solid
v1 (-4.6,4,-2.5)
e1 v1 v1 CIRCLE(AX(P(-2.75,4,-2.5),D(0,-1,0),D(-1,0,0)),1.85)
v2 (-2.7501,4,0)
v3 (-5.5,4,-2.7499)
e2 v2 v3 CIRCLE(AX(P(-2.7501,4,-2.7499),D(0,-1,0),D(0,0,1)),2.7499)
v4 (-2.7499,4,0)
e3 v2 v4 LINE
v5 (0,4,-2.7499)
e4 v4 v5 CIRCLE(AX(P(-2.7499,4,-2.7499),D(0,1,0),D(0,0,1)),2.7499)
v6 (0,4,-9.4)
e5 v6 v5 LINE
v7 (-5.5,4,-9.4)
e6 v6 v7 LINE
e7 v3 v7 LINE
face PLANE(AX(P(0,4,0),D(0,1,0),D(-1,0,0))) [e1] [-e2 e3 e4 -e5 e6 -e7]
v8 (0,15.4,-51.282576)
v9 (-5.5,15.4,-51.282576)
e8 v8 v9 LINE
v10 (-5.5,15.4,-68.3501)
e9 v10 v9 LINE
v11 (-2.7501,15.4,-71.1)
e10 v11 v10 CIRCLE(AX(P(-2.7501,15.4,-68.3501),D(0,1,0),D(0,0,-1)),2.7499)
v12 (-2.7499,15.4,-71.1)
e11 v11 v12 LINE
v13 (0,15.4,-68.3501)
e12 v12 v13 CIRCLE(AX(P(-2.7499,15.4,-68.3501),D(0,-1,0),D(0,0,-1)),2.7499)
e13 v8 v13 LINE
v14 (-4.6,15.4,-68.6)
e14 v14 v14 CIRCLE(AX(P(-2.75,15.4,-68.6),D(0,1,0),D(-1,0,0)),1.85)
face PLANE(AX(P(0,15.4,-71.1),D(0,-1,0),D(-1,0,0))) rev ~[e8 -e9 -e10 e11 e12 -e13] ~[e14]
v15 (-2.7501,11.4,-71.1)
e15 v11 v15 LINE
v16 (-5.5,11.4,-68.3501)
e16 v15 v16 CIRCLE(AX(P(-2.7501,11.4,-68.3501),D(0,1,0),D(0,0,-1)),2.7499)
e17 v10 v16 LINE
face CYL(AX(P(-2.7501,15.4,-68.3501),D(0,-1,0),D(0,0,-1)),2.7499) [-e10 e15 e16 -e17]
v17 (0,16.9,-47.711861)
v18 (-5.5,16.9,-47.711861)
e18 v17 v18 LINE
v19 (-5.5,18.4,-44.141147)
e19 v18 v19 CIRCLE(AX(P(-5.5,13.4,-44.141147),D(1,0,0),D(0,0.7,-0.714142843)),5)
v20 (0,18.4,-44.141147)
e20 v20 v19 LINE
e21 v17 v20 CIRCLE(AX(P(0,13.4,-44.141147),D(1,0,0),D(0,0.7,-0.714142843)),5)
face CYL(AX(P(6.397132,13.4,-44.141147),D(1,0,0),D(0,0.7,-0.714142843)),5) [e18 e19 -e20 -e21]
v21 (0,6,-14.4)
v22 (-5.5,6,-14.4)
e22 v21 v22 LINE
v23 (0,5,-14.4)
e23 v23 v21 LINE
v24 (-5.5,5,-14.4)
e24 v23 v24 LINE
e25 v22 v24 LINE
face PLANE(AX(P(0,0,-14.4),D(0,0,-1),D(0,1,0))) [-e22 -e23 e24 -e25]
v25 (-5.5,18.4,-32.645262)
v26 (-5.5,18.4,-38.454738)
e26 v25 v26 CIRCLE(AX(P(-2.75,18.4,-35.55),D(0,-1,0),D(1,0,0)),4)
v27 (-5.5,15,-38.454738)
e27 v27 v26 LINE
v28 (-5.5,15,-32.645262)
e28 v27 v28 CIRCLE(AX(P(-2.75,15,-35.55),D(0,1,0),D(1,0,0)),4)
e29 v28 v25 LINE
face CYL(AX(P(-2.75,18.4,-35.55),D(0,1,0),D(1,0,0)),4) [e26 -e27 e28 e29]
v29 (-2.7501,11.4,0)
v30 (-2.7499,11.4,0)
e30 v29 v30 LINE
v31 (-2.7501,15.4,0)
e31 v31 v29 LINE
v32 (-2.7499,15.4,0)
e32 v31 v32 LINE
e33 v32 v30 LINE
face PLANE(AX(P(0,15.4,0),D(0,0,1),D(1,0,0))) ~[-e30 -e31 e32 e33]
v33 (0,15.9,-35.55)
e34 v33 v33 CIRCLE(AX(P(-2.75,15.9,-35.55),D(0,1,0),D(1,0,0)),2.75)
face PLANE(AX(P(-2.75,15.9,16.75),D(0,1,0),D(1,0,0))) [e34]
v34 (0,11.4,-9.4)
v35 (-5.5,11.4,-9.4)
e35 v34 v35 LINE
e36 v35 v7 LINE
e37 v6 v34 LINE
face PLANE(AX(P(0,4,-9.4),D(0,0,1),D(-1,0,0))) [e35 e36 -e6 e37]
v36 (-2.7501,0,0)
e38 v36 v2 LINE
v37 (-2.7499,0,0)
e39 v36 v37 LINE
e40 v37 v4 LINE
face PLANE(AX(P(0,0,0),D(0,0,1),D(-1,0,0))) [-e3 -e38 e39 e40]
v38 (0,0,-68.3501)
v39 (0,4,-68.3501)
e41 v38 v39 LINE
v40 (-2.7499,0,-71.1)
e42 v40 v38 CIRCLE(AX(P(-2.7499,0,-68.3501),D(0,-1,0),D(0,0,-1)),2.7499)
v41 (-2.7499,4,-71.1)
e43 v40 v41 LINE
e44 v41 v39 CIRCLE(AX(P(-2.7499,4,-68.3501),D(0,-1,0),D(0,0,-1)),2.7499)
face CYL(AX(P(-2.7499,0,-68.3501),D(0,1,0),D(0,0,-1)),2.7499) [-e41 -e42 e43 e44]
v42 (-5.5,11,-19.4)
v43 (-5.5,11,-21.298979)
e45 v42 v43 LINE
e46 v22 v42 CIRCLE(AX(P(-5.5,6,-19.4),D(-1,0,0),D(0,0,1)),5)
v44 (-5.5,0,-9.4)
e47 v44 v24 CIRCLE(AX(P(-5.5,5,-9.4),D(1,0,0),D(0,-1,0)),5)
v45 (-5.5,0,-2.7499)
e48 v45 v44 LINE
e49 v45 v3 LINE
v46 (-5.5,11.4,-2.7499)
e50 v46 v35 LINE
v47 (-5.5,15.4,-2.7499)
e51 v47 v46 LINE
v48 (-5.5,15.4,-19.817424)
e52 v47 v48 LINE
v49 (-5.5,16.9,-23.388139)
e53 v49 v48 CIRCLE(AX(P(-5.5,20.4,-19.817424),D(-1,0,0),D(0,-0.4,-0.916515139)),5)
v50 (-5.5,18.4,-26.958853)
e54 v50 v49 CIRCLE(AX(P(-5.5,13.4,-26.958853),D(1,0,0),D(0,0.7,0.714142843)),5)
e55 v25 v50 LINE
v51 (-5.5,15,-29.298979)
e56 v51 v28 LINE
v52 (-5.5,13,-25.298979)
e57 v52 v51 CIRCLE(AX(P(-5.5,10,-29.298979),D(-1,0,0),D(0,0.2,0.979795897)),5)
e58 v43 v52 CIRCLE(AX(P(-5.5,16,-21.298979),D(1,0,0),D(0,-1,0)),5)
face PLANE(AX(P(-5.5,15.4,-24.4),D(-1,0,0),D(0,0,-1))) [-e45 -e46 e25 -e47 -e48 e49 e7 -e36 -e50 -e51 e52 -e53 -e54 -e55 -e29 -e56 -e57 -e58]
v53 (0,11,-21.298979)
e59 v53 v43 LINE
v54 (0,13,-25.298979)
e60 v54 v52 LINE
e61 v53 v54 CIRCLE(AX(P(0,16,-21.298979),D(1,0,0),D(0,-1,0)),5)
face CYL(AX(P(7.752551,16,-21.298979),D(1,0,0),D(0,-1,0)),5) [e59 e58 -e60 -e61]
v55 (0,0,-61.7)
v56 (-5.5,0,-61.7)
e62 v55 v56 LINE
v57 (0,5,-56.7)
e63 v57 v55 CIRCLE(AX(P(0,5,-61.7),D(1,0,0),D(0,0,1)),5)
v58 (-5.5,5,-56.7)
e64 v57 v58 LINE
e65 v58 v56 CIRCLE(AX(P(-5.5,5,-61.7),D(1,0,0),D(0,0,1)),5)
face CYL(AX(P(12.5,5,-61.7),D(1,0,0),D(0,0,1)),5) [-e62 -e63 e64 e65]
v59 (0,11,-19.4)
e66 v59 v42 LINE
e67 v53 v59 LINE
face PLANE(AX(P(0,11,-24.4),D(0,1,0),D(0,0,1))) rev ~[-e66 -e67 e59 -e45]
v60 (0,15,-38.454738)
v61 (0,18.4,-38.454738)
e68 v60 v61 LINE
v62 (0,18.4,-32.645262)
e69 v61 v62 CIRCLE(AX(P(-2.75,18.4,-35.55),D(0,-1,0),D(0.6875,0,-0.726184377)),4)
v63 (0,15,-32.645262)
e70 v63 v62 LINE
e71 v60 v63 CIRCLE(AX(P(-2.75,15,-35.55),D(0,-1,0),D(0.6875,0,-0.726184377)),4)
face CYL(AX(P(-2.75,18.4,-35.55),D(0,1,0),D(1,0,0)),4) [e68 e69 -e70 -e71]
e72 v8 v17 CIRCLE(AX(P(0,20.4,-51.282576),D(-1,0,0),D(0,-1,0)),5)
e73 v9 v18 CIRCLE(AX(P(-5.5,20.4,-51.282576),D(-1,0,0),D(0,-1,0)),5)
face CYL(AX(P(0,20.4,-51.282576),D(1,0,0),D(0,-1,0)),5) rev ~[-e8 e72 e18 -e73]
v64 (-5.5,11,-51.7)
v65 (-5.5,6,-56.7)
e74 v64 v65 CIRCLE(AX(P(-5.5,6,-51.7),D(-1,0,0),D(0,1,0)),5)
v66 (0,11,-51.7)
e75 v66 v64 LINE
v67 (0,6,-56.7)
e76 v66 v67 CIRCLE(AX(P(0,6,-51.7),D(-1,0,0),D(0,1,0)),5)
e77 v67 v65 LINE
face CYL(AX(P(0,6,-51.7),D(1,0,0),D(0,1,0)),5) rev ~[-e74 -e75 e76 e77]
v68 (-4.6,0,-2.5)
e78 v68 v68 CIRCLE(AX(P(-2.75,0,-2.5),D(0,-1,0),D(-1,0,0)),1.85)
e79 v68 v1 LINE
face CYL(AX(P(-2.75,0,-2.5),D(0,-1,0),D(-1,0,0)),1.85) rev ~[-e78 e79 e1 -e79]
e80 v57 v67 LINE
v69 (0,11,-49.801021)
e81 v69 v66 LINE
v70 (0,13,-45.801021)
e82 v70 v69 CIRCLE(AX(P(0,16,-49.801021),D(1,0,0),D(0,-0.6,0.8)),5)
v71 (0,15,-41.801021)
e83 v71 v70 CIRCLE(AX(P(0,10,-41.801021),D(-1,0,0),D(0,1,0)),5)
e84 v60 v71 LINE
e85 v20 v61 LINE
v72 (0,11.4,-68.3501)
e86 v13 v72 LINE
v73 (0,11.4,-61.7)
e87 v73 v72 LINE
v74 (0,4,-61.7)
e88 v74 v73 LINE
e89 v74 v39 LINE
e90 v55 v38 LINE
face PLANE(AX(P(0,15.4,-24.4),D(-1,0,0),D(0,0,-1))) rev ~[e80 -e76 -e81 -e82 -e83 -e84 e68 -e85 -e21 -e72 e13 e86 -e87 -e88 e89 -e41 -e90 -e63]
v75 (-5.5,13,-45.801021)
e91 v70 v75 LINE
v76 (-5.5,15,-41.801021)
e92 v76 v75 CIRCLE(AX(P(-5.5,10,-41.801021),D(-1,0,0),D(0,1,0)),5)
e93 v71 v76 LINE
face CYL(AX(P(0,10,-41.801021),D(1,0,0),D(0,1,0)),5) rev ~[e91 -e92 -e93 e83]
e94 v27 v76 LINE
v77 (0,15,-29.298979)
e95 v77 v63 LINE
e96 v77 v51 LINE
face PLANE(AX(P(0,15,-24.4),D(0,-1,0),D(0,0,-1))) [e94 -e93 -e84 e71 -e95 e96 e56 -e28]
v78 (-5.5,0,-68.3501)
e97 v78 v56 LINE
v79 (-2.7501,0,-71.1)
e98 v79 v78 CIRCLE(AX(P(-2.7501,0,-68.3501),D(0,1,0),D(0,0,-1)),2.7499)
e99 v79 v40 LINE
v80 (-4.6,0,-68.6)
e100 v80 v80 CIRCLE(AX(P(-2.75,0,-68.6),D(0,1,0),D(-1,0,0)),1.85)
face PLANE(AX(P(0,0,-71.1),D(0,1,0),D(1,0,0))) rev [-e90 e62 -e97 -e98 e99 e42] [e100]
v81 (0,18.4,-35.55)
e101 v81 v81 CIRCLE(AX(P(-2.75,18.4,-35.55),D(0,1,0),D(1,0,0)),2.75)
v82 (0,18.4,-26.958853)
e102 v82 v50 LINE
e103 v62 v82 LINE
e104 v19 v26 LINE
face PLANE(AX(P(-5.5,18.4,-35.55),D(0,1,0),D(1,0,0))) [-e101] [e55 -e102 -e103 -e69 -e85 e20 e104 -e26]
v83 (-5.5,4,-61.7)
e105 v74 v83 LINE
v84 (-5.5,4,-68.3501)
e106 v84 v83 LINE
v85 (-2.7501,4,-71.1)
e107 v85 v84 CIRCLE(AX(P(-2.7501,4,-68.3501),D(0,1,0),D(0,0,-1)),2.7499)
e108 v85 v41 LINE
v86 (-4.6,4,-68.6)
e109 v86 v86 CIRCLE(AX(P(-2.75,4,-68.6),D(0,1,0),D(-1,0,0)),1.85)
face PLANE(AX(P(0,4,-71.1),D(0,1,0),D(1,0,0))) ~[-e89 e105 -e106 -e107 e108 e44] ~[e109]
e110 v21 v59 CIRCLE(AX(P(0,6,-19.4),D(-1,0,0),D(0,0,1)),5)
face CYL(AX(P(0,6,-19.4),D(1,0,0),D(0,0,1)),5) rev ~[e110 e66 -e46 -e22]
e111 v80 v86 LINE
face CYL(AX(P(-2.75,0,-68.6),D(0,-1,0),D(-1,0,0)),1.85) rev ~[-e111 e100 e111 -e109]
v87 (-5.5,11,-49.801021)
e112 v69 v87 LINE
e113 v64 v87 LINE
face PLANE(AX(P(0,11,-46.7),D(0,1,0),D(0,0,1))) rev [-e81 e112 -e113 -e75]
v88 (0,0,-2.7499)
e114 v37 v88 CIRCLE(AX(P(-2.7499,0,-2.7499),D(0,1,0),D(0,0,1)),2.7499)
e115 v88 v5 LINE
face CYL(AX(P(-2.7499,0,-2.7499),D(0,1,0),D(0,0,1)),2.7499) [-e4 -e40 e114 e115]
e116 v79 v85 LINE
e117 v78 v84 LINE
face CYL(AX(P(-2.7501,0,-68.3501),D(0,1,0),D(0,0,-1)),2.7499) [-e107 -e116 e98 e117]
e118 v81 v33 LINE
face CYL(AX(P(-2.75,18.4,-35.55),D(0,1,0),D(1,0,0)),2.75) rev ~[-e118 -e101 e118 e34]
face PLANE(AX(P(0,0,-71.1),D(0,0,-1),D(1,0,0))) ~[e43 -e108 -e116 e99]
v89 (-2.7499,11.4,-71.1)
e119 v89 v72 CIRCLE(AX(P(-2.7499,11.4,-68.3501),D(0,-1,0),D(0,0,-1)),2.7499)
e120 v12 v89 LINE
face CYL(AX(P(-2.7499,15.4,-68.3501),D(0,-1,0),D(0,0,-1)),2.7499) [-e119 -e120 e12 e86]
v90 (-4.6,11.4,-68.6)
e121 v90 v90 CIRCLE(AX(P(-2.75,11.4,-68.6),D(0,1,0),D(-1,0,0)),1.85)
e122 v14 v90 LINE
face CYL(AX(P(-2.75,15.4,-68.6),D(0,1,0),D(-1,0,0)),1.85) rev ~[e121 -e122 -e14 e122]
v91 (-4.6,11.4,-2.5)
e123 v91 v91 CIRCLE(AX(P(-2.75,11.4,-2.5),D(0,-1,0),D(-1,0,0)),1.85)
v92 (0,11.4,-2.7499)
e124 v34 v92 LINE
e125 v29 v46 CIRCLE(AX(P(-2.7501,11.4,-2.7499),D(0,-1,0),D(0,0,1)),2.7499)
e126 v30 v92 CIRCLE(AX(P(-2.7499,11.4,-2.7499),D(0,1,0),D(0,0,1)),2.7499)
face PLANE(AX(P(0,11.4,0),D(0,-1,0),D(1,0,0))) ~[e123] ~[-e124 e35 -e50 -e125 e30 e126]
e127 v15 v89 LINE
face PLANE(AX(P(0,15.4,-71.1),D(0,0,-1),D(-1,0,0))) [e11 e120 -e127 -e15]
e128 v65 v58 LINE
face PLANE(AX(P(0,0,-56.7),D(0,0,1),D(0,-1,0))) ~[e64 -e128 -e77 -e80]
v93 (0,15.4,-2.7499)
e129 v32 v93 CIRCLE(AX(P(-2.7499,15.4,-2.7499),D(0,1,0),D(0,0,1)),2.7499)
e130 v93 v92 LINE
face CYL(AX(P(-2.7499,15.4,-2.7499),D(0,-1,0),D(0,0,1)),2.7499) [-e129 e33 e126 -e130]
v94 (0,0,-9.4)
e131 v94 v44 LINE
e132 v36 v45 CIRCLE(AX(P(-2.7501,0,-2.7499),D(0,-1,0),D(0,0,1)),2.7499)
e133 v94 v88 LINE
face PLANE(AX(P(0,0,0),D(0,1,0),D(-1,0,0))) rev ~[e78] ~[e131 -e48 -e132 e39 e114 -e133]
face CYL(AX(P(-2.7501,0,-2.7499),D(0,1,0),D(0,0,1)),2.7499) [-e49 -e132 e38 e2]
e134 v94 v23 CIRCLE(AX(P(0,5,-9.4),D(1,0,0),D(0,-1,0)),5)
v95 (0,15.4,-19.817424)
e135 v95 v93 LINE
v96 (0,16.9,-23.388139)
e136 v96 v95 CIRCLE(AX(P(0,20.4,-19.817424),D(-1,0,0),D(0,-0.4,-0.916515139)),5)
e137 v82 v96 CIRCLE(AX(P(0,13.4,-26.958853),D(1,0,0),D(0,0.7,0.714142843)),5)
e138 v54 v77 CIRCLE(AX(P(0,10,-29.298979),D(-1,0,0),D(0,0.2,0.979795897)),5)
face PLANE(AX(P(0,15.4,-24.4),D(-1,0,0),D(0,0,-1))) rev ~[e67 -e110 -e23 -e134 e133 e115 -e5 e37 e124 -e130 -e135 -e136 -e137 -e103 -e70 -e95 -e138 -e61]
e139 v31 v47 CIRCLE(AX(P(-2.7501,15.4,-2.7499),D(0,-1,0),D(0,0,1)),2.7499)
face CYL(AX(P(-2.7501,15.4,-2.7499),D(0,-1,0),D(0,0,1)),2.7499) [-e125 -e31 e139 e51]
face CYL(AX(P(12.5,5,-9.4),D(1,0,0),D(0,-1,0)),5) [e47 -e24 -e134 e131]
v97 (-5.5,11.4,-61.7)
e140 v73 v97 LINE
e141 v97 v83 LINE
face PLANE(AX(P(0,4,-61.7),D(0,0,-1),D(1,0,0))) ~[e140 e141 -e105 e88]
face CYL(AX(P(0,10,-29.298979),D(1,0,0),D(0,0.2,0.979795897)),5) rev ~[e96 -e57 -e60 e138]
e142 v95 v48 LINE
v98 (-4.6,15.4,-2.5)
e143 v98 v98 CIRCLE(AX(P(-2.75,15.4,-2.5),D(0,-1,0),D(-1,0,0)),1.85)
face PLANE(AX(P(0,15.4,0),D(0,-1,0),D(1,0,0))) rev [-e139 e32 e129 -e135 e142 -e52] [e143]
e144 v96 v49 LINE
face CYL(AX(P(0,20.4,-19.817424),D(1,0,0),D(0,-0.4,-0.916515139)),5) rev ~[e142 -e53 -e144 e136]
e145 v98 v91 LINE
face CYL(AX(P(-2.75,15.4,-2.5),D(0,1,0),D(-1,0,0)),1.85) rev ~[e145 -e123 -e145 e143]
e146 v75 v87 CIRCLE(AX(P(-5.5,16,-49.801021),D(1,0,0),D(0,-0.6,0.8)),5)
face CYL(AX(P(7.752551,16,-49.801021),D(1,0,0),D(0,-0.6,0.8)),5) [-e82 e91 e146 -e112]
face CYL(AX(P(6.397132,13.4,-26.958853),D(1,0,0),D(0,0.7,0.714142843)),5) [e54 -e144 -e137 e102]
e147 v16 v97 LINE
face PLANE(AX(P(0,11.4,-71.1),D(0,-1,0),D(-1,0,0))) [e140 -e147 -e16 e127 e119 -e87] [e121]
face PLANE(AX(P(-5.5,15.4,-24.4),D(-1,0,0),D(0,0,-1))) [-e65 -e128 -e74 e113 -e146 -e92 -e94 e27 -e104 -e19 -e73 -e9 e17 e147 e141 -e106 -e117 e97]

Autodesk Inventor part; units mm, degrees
ref_plane "YZ Plane" through (0, 0, 0) normal (1, 0, 0) x (0, 1, 0)
ref_plane "XZ Plane" through (0, 0, 0) normal (0, 1, 0) x (-1, 0, 0)
ref_plane "XY Plane" through (0, 0, 0) normal (0, 0, 1) x (1, 0, 0)
sketch "Эскиз1" plane through (0, 0, 0) normal (0, 1, 0) x (-1, 0, 0)
  line L0 (0, 0) -> (5.5, 0)
  line L1 (5.5, 0) -> (5.5, -35.55)
  line L2 (5.5, -35.55) -> (0, -35.55)
  line L3 (0, -35.55) -> (0, 0)
  line L4 (2.75, 0) -> (2.75, -2.5)
  circle A0 centre (2.75, -2.5) radius 1.85
  dimension "d0" = 5.5
  dimension "d1" = 35.55
  dimension "d4" = 2.5
  dimension "d5" = 3.7
extrude "Выдавливание1" add sketch "Эскиз1" along normal blind 4
fillet "Сопряжение1" radius 2.75 2 edges at (0, 2, 0) (-5.5, 2, 0)
sketch "Эскиз2" plane through (0, 4, 0) normal (0, 1, 0) x (1, 0, 0)
  line L0 (0, 2.75) -> (0, 35.55) projected
  line L1 (-5.5, 35.55) -> (0, 35.55)
  line L2 (0, 35.55) -> (0, 9.4)
  line L3 (0, 9.4) -> (-5.5, 9.4)
  line L4 (-5.5, 9.4) -> (-5.5, 35.55)
  point P0 (0, 0)
  point P1 (0, 35.55)
  dimension "d7" = 26.15
  dimension "d45" = 32.8
extrude "Выдавливание2" add sketch "Эскиз2" along normal blind 3.7
mirror "Зеркальное отражение3" about plane through (-2.75, 7.7, -22.475) normal (0, 1, 0)
sketch "Эскиз8" plane through (0, 0, -2.75) normal (1, 0, 0) x (0, 0, -1)
  line L0 (0, 0) -> (32.8, 0) projected
  line L1 (32.8, 0) -> (11.65, 0)
  line L2 (11.65, 0) -> (11.65, 15)
  line L3 (11.65, 15) -> (32.8, 15)
  line L4 (32.8, 15) -> (32.8, 0)
  line L5 (6.65, 4) -> (6.65, 11.4) projected
  line L6 (11.65, 15) -> (21.65, 15)
  line L7 (21.65, 15) -> (21.65, 11)
  line L8 (21.65, 11) -> (11.65, 11)
  line L9 (11.65, 11) -> (11.65, 15)
  point P0 (-2.75, 0)
  dimension "d35" = 21.15
  dimension "d36" = 15
  dimension "d52" = 26.15
  dimension "d60" = 10
  dimension "d61" = 4
extrude "Выдавливание6" cut sketch "Эскиз8" against normal through all contours L2 L8 L7 L3 L4 L0
sketch "Эскиз13" plane through (-5.5, 15.4, -35.55) normal (0, 1, 0) x (1, 0, 0)
  line L0 (0, 0) -> (0, -11.15) projected
  line L1 (5.5, 0) -> (0, 0) projected
  line L2 (5.5, -11.15) -> (5.5, 0) projected
  line L3 (5.5, -11.15) -> (0, -11.15) projected
  point P0 (5.5, -35.55)
extrude "Выдавливание11" add sketch "Эскиз13" along normal blind 3
mirror "Зеркальное отражение6" about plane through (0, 0, -35.55) normal (0, 0, -1)
fillet "Сопряжение5" radius 5 12 edges at (-2.75, 0, -14.4) (-2.75, 0, -56.7) (-2.75, 11, -14.4) (-2.75, 11, -24.4) (-2.75, 15, -24.4) (-2.75, 11, -56.7) (-2.75, 11, -46.7) (-2.75, 15, -46.7) (-2.75, 18.4, -24.4) (-2.75, 18.4, -46.7) (-2.75, 15.4, -24.4) (-2.75, 15.4, -46.7)
sketch "Эскиз9" plane through (-2.75, 18.4, 16.75) normal (0, 1, 0) x (1, 0, 0)
  circle A0 centre (0, 52.3) radius 4
  line L0 (-2.75, 58.551) -> (-2.75, 46.049) projected
  line L1 (-2.75, 52.3) -> (2.75, 52.3)
  line L2 (2.75, 58.551) -> (2.75, 46.049) projected
  point P0 (2.75, 104.6)
  point P1 (-2.75, 104.6)
  point P2 (60.3162, 64.5588)
  point P3 (0, 52.3)
  dimension "d46" = 8
extrude "Выдавливание7" add sketch "Эскиз9" against normal up to surface (3.4 mm away)
sketch "Эскиз10" plane through (-2.75, 18.4, 16.75) normal (0, 1, 0) x (1, 0, 0)
  arc A0 (-2.75, 55.2047) -> (-2.75, 49.3953) centre (0, 52.3) ccw projected
  arc A1 (-2.75, 55.2047) -> (-2.75, 49.3953) centre (0, 52.3) ccw projected
  circle A2 centre (0, 52.3) radius 2.75
  point P0 (2.75, 16.75)
  point P1 (-2.75, 23.7297)
  point P2 (-2.75, 17.9203)
  point P3 (2.75, 17.9203)
  point P4 (2.75, 23.7297)
  dimension "d49" = 5.5
extrude "Выдавливание8" cut sketch "Эскиз10" against normal blind 2.5
properties part number "Балка рулевого управления"
